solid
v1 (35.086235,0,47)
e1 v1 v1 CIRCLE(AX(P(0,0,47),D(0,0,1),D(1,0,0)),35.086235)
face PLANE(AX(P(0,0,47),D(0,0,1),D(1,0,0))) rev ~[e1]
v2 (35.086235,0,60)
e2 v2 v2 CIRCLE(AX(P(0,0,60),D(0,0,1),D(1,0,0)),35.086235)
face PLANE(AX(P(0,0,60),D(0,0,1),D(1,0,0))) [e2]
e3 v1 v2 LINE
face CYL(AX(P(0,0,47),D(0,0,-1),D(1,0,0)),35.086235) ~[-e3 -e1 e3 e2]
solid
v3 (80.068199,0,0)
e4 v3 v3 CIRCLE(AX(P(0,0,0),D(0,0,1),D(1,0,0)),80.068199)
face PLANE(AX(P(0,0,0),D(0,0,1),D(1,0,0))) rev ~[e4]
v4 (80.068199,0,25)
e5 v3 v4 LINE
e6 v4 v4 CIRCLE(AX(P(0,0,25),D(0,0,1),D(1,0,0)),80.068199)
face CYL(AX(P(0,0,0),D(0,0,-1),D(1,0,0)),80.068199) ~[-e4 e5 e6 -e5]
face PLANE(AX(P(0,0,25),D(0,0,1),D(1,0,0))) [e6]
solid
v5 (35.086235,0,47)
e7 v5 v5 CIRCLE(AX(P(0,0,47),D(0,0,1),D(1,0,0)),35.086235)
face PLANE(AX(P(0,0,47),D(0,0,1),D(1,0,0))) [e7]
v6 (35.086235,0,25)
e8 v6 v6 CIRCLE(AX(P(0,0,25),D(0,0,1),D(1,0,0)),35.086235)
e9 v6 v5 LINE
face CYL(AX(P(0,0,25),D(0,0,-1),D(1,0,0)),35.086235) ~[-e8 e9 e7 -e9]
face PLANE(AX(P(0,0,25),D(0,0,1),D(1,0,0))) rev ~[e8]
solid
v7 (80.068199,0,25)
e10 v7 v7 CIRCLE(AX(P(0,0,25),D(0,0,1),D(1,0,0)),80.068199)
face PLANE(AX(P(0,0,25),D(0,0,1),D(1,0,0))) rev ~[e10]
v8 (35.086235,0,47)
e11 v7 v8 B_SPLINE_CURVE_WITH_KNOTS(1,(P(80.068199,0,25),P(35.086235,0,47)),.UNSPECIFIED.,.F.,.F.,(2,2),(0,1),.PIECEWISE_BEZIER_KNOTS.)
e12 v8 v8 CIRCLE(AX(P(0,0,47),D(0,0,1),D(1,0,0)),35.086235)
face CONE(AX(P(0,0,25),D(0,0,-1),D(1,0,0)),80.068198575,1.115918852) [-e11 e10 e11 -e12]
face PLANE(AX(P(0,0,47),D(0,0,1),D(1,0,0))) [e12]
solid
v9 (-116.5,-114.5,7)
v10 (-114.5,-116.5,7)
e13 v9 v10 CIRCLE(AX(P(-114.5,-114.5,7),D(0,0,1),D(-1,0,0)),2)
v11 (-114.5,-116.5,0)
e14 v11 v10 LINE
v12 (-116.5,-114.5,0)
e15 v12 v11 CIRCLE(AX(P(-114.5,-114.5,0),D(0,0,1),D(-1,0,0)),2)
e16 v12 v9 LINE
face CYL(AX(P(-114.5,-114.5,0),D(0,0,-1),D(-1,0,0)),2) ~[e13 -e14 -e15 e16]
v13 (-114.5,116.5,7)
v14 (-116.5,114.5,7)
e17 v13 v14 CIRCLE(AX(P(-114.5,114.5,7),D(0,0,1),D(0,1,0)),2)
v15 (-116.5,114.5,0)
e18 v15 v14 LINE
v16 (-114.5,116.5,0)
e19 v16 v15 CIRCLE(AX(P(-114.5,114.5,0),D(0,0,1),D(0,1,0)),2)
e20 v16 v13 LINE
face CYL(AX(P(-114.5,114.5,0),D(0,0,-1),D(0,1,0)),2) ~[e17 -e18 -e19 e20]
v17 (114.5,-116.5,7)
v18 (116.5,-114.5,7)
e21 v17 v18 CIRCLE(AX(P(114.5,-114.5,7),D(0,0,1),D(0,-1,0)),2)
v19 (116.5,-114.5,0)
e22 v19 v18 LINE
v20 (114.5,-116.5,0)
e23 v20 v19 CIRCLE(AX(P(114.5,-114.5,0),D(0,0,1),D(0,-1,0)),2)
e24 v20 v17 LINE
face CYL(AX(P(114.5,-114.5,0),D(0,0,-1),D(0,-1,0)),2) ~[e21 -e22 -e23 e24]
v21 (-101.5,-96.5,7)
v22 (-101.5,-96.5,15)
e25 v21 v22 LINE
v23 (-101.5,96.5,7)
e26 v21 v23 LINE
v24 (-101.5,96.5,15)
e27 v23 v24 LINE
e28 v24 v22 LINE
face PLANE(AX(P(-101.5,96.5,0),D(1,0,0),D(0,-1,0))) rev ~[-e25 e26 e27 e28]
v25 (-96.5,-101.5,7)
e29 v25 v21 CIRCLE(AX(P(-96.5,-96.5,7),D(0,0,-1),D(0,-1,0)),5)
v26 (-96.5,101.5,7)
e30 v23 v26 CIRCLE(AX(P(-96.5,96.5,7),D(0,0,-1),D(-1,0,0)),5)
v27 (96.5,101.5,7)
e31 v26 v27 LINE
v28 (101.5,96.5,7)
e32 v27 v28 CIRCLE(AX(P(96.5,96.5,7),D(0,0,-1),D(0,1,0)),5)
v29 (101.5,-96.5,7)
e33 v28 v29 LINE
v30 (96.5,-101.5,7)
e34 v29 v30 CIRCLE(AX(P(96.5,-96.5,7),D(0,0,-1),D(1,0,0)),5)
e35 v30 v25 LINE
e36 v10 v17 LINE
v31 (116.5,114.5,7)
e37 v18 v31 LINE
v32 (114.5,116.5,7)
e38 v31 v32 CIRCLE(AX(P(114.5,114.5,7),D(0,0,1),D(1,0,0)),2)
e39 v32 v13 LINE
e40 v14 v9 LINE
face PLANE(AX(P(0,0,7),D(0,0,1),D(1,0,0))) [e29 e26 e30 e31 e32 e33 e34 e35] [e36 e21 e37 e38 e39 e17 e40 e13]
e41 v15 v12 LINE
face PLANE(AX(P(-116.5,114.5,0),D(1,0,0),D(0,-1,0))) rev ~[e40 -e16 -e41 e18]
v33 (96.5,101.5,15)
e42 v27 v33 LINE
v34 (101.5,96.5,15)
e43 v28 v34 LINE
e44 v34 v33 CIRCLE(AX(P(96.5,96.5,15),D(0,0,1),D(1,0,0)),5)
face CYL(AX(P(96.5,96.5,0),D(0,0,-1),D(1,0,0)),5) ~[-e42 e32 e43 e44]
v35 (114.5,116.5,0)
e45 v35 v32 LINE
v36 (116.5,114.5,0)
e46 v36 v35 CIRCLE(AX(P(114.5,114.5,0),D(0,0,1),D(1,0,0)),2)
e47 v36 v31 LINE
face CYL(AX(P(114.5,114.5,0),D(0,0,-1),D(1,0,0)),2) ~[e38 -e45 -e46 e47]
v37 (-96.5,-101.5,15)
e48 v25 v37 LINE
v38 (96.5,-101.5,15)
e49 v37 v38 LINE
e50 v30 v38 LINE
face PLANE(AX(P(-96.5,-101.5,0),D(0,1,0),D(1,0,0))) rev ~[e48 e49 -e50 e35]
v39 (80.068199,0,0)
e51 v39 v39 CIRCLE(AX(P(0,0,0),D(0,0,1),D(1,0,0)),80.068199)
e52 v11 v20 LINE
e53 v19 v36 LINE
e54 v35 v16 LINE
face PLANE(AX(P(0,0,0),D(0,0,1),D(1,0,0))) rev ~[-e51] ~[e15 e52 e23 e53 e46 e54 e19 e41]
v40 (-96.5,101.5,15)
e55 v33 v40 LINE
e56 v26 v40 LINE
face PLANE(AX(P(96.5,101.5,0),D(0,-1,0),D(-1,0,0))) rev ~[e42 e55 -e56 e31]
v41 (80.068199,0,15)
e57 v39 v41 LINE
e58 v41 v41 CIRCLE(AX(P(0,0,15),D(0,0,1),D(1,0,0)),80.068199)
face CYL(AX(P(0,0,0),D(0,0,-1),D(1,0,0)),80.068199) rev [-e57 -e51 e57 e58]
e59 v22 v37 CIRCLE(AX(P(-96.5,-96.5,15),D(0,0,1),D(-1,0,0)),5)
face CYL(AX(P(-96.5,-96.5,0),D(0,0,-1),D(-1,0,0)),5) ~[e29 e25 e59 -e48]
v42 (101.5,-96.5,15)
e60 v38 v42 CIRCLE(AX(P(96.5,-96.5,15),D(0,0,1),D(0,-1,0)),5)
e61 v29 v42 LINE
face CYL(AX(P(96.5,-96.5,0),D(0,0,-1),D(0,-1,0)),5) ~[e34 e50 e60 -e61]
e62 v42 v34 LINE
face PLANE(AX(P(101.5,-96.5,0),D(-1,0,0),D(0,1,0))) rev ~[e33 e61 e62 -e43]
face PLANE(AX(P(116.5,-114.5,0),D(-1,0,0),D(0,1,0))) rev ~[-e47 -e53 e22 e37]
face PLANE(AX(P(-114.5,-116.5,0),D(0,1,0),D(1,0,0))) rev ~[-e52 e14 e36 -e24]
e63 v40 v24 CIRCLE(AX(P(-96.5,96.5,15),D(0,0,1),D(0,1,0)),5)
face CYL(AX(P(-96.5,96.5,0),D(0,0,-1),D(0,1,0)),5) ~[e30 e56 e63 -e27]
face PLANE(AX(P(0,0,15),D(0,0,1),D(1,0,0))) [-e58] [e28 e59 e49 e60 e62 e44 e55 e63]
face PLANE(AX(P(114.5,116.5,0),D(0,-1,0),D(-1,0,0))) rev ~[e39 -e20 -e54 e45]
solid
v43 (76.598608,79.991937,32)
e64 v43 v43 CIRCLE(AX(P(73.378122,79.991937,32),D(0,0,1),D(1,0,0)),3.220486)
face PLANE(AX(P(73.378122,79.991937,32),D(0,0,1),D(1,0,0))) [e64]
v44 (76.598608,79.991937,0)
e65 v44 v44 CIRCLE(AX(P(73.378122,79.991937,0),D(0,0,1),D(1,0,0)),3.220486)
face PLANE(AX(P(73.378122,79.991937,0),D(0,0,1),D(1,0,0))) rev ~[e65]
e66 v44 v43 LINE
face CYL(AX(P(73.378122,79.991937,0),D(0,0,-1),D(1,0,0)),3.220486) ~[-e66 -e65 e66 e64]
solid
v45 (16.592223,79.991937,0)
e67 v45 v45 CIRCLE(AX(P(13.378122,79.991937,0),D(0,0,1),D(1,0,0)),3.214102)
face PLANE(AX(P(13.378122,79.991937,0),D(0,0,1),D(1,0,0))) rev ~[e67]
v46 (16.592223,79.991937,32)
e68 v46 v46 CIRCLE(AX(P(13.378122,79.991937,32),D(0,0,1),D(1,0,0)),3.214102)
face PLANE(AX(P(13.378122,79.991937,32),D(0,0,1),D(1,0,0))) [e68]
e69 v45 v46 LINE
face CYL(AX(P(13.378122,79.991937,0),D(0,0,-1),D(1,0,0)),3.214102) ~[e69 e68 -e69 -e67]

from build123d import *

# Parameters (mm, degrees)
F0_R      = 80.0681985748
F1_DEPTH  = 15
F2_DEPTH  = 7
F7_START  = 25
F0_R_2    = 35.086234683
F7_DEPTH  = 22
F8_DEPTH  = 25
F8_FACE_R = 80.0681985748
F7_FACE_R = 35.086234683
F10_DEPTH = 13
F6_R      = 3.2141015645
F11_DEPTH = 32
F6_R_2    = 3.2204856396


# Not quite as in the source:
# - the program builds the solid bodies; features that only make, move or delete a surface that nothing else refers to are left out


with BuildPart() as f1:
    # F0 (on Top) → F1 (new body)
    with BuildSketch(Plane.XY):
        with BuildLine():
            ThreePointArc((-96.5, 101.5), (-100.0355339059, 100.0355339059), (-101.5, 96.5))
            Line((-101.5, 96.5), (-101.5, -96.5))
            ThreePointArc((-101.5, -96.5), (-100.0355339059, -100.0355339059), (-96.5, -101.5))
            Line((-96.5, -101.5), (96.5, -101.5))
            ThreePointArc((96.5, -101.5), (100.0355339059, -100.0355339059), (101.5, -96.5))
            Line((101.5, -96.5), (101.5, 96.5))
            ThreePointArc((101.5, 96.5), (100.0355339059, 100.0355339059), (96.5, 101.5))
            Line((96.5, 101.5), (-96.5, 101.5))
        make_face()
        Circle(F0_R, mode=Mode.SUBTRACT)
    extrude(amount=F1_DEPTH)

    # F0 (on Top) → F2 (join)
    with BuildSketch(Plane.XY):
        with BuildLine():
            Line((114.5, 116.5), (-114.5, 116.5))
            ThreePointArc((-114.5, 116.5), (-115.9142135624, 115.9142135624), (-116.5, 114.5))
            Line((-116.5, 114.5), (-116.5, -114.5))
            ThreePointArc((-116.5, -114.5), (-115.9142135624, -115.9142135624), (-114.5, -116.5))
            Line((-114.5, -116.5), (114.5, -116.5))
            ThreePointArc((114.5, -116.5), (115.9142135624, -115.9142135624), (116.5, -114.5))
            Line((116.5, -114.5), (116.5, 114.5))
            ThreePointArc((116.5, 114.5), (115.9142135624, 115.9142135624), (114.5, 116.5))
        make_face()
        with BuildLine():
            Line((-101.5, -96.5), (-101.5, 96.5))
            ThreePointArc((-101.5, 96.5), (-100.0355339059, 100.0355339059), (-96.5, 101.5))
            Line((-96.5, 101.5), (96.5, 101.5))
            ThreePointArc((96.5, 101.5), (100.0355339059, 100.0355339059), (101.5, 96.5))
            Line((101.5, 96.5), (101.5, -96.5))
            ThreePointArc((101.5, -96.5), (100.0355339059, -100.0355339059), (96.5, -101.5))
            Line((96.5, -101.5), (-96.5, -101.5))
            ThreePointArc((-96.5, -101.5), (-100.0355339059, -100.0355339059), (-101.5, -96.5))
        make_face(mode=Mode.SUBTRACT)
    extrude(amount=F2_DEPTH)


with BuildPart() as f7:
    # F0 (on Top) → F7 (new body)
    with BuildSketch(Plane.XY.offset(F7_START)):
        Circle(F0_R_2)
    extrude(amount=F7_DEPTH)


with BuildPart() as f8:
    # F0 (on Top) → F8 (new body)
    with BuildSketch(Plane.XY):
        Circle(F0_R)
        Circle(F0_R_2, mode=Mode.SUBTRACT)
        Circle(F0_R_2)
    extrude(amount=F8_DEPTH)


with BuildPart() as f9:
    # F8_face (on face) → F9 section 0
    with BuildSketch(Plane.XY.offset(25)):
        Circle(F8_FACE_R)
    # F7_face (on face) → F9 section 1
    with BuildSketch(Plane.XY.offset(47)):
        Circle(F7_FACE_R)
    loft()


with BuildPart() as f10:
    # F10 (new): a face of the model
    f10_faces = [f7.part.faces().sort_by_distance(p)[0] for p in [
        (0, 0, 47),
    ]]
    extrude(f10_faces, amount=F10_DEPTH)


with BuildPart() as f11:
    # F6 (on Top) → F11 (new body)
    with BuildSketch(Plane.XY):
        with Locations((13.3781218901, 79.9919366837)):
            Circle(F6_R)
    extrude(amount=F11_DEPTH)


with BuildPart() as f11b:
    # F6 (on Top) → F11, piece 2 (new body)
    with BuildSketch(Plane.XY):
        with Locations((73.3781218901, 79.9919366837)):
            Circle(F6_R_2)
    extrude(amount=F11_DEPTH)


solid = Compound([f1.part, f7.part, f8.part, f9.part, f10.part, f11.part, f11b.part])
